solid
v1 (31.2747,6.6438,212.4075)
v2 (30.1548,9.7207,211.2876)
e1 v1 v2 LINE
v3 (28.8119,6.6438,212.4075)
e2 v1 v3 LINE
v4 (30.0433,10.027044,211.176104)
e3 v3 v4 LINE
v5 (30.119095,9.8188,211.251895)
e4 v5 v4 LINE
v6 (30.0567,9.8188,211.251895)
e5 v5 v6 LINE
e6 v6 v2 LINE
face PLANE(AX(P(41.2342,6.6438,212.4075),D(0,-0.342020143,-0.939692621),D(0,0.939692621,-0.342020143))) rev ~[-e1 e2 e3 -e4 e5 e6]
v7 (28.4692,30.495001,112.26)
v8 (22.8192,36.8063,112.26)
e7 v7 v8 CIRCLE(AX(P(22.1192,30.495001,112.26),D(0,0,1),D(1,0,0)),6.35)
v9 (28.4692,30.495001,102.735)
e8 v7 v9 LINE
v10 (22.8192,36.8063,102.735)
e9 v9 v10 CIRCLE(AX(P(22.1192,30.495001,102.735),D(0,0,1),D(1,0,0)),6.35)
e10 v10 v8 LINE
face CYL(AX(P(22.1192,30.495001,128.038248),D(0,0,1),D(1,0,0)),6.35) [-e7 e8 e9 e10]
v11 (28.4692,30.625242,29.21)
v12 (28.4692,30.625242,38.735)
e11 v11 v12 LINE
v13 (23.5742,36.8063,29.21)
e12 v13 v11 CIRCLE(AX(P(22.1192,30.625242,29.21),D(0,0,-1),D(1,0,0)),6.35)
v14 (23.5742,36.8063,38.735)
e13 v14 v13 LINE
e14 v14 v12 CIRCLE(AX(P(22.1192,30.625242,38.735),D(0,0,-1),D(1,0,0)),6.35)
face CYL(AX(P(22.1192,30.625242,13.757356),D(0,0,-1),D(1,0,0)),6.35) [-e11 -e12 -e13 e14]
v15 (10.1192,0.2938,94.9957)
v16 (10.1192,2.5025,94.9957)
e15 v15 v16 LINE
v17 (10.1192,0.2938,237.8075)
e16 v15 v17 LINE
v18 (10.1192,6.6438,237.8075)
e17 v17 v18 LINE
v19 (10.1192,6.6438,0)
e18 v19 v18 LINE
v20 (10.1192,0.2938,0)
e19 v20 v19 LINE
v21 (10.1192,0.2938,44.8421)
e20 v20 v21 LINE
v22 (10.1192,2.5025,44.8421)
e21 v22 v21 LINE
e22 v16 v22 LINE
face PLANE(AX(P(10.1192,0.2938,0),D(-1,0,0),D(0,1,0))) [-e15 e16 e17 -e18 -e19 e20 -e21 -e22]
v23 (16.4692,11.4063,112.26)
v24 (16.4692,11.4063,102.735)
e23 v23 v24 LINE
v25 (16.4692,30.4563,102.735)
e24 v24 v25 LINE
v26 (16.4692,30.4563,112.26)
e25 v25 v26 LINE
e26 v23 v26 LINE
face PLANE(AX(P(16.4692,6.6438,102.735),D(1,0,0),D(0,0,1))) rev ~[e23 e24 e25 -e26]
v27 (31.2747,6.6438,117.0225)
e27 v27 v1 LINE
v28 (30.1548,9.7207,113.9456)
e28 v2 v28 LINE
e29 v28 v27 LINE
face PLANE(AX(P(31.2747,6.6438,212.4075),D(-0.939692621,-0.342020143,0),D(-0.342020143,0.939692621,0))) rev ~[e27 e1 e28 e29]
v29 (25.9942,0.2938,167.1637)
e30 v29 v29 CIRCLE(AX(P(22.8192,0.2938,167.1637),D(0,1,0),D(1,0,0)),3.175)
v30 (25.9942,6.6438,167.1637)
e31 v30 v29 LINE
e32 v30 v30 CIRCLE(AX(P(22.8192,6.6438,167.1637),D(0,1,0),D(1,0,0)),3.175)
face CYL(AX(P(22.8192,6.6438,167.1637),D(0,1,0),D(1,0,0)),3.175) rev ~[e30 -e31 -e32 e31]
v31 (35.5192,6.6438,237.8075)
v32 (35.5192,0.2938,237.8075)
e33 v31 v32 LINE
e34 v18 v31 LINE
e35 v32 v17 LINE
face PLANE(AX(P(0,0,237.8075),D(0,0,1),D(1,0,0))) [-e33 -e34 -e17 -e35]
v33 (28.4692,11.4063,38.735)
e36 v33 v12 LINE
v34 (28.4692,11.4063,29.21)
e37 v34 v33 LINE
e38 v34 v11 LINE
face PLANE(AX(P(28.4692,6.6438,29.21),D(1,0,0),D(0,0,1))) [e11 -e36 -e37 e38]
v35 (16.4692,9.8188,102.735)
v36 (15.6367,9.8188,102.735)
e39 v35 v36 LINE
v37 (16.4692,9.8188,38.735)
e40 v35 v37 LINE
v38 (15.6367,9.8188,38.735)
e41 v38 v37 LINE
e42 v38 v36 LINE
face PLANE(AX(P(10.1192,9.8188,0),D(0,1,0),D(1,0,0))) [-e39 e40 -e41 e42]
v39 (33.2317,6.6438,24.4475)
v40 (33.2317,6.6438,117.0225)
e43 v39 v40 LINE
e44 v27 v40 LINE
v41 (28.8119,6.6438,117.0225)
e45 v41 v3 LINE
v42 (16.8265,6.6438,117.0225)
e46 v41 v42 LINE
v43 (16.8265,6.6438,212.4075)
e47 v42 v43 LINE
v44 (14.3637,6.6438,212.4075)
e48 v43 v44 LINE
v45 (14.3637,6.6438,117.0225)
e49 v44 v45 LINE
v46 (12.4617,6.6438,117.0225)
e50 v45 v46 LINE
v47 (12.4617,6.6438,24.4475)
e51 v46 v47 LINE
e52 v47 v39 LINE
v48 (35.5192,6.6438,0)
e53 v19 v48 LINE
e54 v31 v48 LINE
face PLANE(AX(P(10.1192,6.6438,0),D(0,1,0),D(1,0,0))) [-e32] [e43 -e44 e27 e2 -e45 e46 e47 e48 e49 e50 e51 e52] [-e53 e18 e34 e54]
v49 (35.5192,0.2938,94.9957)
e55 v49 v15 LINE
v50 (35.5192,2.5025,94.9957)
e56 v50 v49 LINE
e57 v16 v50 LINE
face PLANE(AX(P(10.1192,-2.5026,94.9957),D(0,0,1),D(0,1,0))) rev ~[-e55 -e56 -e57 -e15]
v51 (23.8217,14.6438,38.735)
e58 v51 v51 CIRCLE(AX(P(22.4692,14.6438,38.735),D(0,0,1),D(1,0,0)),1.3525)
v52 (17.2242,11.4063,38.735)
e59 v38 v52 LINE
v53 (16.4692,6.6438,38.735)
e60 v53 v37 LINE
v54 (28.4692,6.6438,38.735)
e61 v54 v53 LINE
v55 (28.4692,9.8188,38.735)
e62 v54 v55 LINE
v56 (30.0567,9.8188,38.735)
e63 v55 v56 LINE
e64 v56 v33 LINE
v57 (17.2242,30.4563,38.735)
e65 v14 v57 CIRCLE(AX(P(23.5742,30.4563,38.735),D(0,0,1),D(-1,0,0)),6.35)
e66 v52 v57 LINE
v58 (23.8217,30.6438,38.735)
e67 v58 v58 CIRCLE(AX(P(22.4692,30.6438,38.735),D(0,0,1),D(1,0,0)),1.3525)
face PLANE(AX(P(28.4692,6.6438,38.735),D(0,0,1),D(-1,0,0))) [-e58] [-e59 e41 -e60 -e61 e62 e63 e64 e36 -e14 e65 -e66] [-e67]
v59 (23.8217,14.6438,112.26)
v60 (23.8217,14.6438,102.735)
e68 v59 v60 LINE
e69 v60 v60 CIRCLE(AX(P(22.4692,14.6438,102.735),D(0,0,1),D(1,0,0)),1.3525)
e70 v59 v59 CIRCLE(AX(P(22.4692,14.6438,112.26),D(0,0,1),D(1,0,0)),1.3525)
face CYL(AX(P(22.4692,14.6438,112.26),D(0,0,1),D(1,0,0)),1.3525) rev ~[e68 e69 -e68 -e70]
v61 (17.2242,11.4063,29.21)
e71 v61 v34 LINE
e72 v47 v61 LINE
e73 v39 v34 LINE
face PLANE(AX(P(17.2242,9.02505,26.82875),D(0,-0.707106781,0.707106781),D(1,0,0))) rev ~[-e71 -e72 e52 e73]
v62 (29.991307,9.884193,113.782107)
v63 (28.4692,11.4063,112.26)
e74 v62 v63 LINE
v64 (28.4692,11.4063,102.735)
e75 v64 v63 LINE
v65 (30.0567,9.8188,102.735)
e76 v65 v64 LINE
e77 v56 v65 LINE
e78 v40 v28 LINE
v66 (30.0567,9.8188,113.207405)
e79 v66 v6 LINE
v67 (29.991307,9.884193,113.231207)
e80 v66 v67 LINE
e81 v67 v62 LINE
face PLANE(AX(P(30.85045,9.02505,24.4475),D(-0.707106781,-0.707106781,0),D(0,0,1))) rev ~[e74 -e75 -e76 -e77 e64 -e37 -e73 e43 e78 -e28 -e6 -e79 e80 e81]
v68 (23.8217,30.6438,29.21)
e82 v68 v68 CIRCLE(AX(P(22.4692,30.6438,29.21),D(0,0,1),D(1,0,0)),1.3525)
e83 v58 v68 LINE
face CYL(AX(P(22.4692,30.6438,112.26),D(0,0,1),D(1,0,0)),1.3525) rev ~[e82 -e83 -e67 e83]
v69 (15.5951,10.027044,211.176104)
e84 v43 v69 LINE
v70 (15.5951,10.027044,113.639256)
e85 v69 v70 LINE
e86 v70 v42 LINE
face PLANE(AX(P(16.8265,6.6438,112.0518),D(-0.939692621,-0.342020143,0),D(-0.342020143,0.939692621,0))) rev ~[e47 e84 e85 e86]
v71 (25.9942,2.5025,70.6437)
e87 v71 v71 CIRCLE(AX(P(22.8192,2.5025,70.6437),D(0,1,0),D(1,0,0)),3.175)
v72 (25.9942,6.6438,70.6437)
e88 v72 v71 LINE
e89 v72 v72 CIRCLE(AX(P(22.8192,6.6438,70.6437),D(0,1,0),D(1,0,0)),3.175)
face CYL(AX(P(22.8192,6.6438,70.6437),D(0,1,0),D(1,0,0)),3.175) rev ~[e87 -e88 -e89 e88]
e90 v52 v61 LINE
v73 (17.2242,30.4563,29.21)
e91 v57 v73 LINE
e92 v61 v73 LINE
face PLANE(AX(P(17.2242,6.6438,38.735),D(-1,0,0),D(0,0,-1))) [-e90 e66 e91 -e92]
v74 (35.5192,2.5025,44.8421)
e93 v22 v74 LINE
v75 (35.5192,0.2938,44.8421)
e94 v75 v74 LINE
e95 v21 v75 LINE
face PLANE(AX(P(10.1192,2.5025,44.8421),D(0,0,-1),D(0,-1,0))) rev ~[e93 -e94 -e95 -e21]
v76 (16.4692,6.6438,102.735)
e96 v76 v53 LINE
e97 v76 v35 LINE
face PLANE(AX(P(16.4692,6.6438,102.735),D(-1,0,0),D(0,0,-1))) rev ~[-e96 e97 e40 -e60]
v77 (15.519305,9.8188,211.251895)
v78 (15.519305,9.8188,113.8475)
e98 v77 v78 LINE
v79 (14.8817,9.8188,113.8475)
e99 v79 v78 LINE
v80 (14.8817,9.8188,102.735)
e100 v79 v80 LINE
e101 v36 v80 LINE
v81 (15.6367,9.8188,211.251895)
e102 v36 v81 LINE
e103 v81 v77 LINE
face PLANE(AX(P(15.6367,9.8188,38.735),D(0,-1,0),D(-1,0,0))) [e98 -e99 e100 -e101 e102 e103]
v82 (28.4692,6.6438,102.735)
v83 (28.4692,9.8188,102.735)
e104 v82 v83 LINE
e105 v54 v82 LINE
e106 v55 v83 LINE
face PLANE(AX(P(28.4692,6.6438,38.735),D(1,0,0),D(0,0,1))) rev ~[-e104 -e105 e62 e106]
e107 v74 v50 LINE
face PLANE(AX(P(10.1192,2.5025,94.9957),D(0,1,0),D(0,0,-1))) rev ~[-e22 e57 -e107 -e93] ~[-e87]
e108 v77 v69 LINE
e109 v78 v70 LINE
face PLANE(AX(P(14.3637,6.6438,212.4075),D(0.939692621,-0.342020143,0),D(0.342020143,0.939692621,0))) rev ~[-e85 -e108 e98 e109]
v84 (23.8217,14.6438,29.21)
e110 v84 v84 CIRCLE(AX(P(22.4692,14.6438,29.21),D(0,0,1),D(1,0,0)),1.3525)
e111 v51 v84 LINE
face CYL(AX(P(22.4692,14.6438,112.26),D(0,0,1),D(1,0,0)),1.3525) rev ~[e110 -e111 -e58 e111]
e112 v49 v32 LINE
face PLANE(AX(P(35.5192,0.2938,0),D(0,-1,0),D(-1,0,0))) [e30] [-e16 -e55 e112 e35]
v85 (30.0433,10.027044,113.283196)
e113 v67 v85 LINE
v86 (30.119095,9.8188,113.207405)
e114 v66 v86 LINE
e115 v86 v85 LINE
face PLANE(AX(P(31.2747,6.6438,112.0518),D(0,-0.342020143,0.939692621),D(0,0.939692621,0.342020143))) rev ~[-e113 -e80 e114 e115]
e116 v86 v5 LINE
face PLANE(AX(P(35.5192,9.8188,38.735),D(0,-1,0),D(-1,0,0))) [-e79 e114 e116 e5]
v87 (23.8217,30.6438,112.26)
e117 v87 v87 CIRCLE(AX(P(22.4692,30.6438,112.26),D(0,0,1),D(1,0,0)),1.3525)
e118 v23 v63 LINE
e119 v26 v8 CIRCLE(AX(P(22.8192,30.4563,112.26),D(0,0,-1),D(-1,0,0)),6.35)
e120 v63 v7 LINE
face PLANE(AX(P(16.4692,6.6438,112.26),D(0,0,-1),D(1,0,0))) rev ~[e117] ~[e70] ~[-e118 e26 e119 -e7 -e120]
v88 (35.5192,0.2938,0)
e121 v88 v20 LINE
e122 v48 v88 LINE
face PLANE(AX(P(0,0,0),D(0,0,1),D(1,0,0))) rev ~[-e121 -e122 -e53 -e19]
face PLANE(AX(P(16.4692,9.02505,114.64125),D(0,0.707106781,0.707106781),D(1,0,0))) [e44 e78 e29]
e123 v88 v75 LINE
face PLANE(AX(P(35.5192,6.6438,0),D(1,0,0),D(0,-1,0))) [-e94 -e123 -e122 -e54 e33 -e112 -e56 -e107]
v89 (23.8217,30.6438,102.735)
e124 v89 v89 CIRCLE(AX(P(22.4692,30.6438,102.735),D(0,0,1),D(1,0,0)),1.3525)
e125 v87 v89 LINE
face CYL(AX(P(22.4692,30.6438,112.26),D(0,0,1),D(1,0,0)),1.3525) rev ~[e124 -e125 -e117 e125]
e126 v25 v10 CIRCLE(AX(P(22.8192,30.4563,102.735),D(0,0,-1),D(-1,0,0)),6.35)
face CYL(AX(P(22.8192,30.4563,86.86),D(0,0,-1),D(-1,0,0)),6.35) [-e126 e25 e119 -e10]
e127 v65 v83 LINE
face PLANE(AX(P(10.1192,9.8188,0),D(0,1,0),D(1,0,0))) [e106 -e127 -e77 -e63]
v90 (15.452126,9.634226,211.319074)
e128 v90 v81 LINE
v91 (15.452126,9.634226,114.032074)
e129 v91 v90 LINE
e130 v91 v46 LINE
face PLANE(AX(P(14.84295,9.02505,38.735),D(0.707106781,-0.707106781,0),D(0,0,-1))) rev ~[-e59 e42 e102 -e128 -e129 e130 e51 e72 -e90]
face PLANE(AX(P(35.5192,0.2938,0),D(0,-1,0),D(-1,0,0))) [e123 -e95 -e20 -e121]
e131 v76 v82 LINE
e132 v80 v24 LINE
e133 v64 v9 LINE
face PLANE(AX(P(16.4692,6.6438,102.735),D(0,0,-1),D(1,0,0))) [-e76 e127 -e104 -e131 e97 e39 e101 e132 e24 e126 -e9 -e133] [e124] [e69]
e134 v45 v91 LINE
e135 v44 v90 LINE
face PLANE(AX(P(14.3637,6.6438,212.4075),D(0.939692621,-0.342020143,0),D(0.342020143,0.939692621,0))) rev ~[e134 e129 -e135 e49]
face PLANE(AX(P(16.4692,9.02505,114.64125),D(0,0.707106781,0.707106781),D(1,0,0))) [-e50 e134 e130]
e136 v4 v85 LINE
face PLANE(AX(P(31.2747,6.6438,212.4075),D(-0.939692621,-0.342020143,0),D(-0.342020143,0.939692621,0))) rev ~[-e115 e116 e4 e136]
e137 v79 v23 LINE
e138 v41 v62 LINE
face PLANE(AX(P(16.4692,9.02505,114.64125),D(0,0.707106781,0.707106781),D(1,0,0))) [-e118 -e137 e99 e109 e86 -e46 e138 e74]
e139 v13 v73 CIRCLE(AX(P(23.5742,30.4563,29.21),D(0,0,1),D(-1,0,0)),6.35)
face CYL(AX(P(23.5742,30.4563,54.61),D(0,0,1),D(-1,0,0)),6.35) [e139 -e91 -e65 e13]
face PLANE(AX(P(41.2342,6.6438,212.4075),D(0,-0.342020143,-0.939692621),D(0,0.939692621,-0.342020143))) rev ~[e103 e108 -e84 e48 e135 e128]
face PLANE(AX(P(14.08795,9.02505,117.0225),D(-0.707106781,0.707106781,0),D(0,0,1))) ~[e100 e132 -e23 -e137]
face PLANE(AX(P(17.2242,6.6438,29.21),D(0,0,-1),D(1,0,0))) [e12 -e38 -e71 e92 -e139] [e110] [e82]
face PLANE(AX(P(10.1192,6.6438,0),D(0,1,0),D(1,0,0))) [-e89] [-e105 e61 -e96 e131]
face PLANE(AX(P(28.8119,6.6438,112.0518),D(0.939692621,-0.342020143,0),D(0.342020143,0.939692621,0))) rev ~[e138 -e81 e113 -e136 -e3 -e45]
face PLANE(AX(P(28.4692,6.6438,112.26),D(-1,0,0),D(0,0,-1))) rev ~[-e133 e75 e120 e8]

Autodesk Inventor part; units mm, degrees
ref_plane "YZ Plane" through (0, 0, 0) normal (1, 0, 0) x (0, 1, 0)
ref_plane "XZ Plane" through (0, 0, 0) normal (0, 1, 0) x (-1, 0, 0)
ref_plane "XY Plane" through (0, 0, 0) normal (0, 0, 1) x (1, 0, 0)
sketch "Sketch1" plane through (0, 0, 0) normal (0, 0, 1) x (1, 0, 0)
  line L0 (10.1192, 6.6438) -> (35.5192, 6.6438)
  line L1 (35.5192, 6.6438) -> (35.5192, 0.2938)
  line L2 (35.5192, 0.2938) -> (10.1192, 0.2938)
  line L3 (10.1192, 0.2938) -> (10.1192, 6.6438)
  point P0 (0, 0)
  dimension "d0" = 25.4
  dimension "d1" = 6.35
extrude "Extrusion1" add sketch "Sketch1" along normal blind 237.8075
sketch "Sketch2" plane through (10.1192, 6.6438, 0) normal (0, 1, 0) x (1, 0, 0)
  line L0 (0, 0) -> (25.4, 0) projected
  line L1 (0, 0) -> (0, -237.8075) projected
  line L2 (25.4, -237.8075) -> (0, -237.8075) projected
  line L3 (25.4, 0) -> (25.4, -237.8075) projected
  line L4 (12.7, 0) -> (12.7, -237.8075) construction
  line L5 (25.4, -237.8075) -> (0, -237.8075) construction
  line L6 (0, 0) -> (0, -237.8075) construction
  line L7 (0, -167.1637) -> (25.4, -167.1637) construction
  line L8 (0, -70.6437) -> (25.4, -70.6437) construction
  line L9 (25.4, 0) -> (25.4, -237.8075) construction
  circle A0 centre (12.7, -70.6437) radius 3.175
  circle A1 centre (12.7, -167.1637) radius 3.175
  line L10 (32.1721, -167.1637) -> (32.1721, -237.8075) construction
  line L11 (29.604, -70.6437) -> (29.604, 0) construction
  point P0 (-10.1192, 0)
  dimension "d6" = 6.35
  dimension "d7" = 6.35
  dimension "d10" = 96.52
extrude "Extrusion2" cut sketch "Sketch2" against normal through all contours A0 | A1
sketch "Sketch3" plane through (10.1192, 0.2938, 0) normal (-1, 0, 0) x (0, 0, 1)
  line L0 (44.8421, -2.7964) -> (94.9957, -2.7964)
  line L1 (94.9957, -2.7964) -> (94.9957, 2.2087)
  line L2 (94.9957, 2.2087) -> (44.8421, 2.2087)
  line L3 (44.8421, 2.2087) -> (44.8421, -2.7964)
  point P0 (0, -0.2938)
extrude "Extrusion3" cut sketch "Sketch3" against normal through all
sketch "Sketch4" plane through (10.1192, 6.6438, 0) normal (0, 1, 0) x (1, 0, 0)
  line L0 (18.35, -38.735) -> (6.35, -38.735) projected
  line L1 (6.35, -102.735) -> (18.35, -102.735) projected
  line L2 (18.35, -38.735) -> (7.105, -38.735)
  line L3 (7.105, -38.735) -> (7.105, -29.21)
  line L4 (7.105, -29.21) -> (18.35, -29.21)
  line L5 (18.35, -29.21) -> (18.35, -38.735)
  line L6 (18.35, -102.735) -> (6.35, -102.735)
  line L7 (6.35, -102.735) -> (6.35, -112.26)
  line L8 (6.35, -112.26) -> (18.35, -112.26)
  line L9 (18.35, -112.26) -> (18.35, -102.735)
  point P0 (-10.1192, 0)
  dimension "d13" = 9.525
  dimension "d14" = 9.525
extrude "Extrusion4" add sketch "Sketch4" along normal blind 30.1625
chamfer "Chamfer1" distance 4.7625 angle 45 2 edges at (22.8467, 6.6438, 29.21) (22.4692, 6.6438, 112.26)
sketch "Sketch5" plane through (16.4692, 36.8063, 112.26) normal (0, 0, 1) x (1, 0, 0)
  circle A0 centre (6, -22.1625) radius 1.3525 projected
  circle A1 centre (6, -6.1625) radius 1.3525 projected
  point P0 (-16.4692, -36.8063)
extrude "Extrusion5" cut sketch "Sketch5" against normal through all
fillet "Fillet1" radius 6.35 4 edges at (16.4692, 36.8063, 107.4975) (28.4692, 36.8063, 107.4975) (17.2242, 36.8063, 33.9725) (28.4692, 36.8063, 33.9725)
chamfer "Chamfer2" distance 4.7625 angle 45 4 edges at (16.4692, 6.6438, 109.8788) (28.4692, 6.6438, 109.8788) (28.4692, 6.6438, 31.5913) (17.2242, 6.6438, 31.5913)
sketch "Sketch6" plane through (10.1192, 6.6438, 0) normal (0, 1, 0) x (1, 0, 0)
  line L0 (25.4, -237.8075) -> (0, -237.8075) projected
  line L1 (18.6927, -237.8075) -> (21.1555, -237.8075)
  line L2 (21.1555, -212.4075) -> (21.1555, -112.0518)
  line L3 (21.1555, -112.0518) -> (18.6927, -112.0518)
  line L4 (18.6927, -112.0518) -> (18.6927, -212.4075)
  line L5 (6.7073, -237.8075) -> (4.2445, -237.8075)
  line L6 (4.2445, -212.4075) -> (4.2445, -112.0518)
  line L7 (4.2445, -112.0518) -> (6.7073, -112.0518)
  line L8 (6.7073, -112.0518) -> (6.7073, -212.4075)
  line L9 (25.4, 0) -> (25.4, -237.8075) projected
  line L10 (0, 0) -> (0, -237.8075) projected
  line L11 (21.1555, -171.8415) -> (25.4, -171.8415)
  line L12 (4.2445, -171.8415) -> (0, -171.8415)
  line L13 (20.8665, -0.289) -> (18.4037, -0.289)
  line L14 (18.4037, -34.2615) -> (20.8665, -34.2615)
  line L15 (7.105, -29.21) -> (2.3425, -24.4475) projected
  line L16 (3.9555, -0.289) -> (6.4182, -0.289)
  line L17 (6.4182, -28.5232) -> (3.9555, -28.5232)
  line L18 (31.115, -212.4075) -> (-5.715, -212.4075) projected
  point P0 (-10.1192, 0)
  point P1 (21.1555, -225.1075)
  point P2 (18.6927, -225.1075)
  point P3 (6.7073, -225.1075)
  point P4 (4.2445, -225.1075)
extrude "Extrusion6" add sketch "Sketch6" along normal blind 4.7625 draft -20 contours L18 L4 L3 L2 | L18 L6 L7 L8
sketch "Sketch7" plane through (10.1192, 6.6438, 0) normal (0, 1, 0) x (1, 0, 0)
  line L0 (18.35, -90.5879) -> (18.35, -50.8821) construction
  line L1 (6.35, -50.8821) -> (6.35, -90.5879) construction
  line L2 (18.35, -99.735) -> (18.35, -41.735) construction
  line L3 (6.35, -99.735) -> (18.35, -99.735) construction
  line L4 (6.35, -41.735) -> (6.35, -99.735) construction
  line L5 (18.35, -41.735) -> (6.35, -41.735) construction
  circle A0 centre (12.35, -54.735) radius 1.3525 construction
  circle A1 centre (12.35, -62.735) radius 1.3525 construction
  circle A2 centre (12.35, -78.735) radius 1.3525 construction
  circle A3 centre (12.35, -86.735) radius 1.3525 construction
  line L6 (1.5875, -102.735) -> (23.1125, -102.735) projected
  line L7 (23.1125, -38.735) -> (2.3425, -38.735) projected
  line L8 (25.4, 0) -> (25.4, -44.8421) projected
  line L9 (18.35, -102.735) -> (25.4, -102.735)
  line L10 (25.4, -102.735) -> (25.4, -38.735)
  line L11 (25.4, -38.735) -> (18.35, -38.735)
  line L12 (18.35, -38.735) -> (18.35, -102.735)
  line L13 (0, 0) -> (0, -237.8075) projected
  line L14 (0, -102.735) -> (6.35, -102.735)
  line L15 (6.35, -102.735) -> (6.35, -38.735)
  line L16 (6.35, -38.735) -> (0, -38.735)
  line L17 (0, -38.735) -> (0, -102.735)
  point P0 (-10.1192, 0)
extrude "Extrusion7" add sketch "Sketch7" along normal blind 3.175 contours L14 L13 L16 L7 L15 L6 | L12 L7 L11 L8 L10 L9 L6
sketch "Sketch8" plane through (35.5192, 6.6438, 38.735) normal (0, 0, -1) x (-1, 0, 0)
  line L0 (5.4625, 3.175) -> (2.2875, 0) projected
  line L1 (0, 3.175) -> (5.4625, 3.175) projected
  line L2 (0, 0) -> (0, 3.175) projected
  line L3 (2.2875, 0) -> (0, 0) projected
  line L4 (23.0575, 0) -> (19.8825, 3.175) projected
  line L5 (25.4, 0) -> (23.0575, 0) projected
  line L6 (25.4, 0) -> (25.4, 3.175) projected
  line L7 (19.8825, 3.175) -> (25.4, 3.175) projected
  point P0 (35.5192, -6.6438)
extrude "Extrusion8" cut sketch "Sketch8" against normal through all
properties part number "Top piece"
